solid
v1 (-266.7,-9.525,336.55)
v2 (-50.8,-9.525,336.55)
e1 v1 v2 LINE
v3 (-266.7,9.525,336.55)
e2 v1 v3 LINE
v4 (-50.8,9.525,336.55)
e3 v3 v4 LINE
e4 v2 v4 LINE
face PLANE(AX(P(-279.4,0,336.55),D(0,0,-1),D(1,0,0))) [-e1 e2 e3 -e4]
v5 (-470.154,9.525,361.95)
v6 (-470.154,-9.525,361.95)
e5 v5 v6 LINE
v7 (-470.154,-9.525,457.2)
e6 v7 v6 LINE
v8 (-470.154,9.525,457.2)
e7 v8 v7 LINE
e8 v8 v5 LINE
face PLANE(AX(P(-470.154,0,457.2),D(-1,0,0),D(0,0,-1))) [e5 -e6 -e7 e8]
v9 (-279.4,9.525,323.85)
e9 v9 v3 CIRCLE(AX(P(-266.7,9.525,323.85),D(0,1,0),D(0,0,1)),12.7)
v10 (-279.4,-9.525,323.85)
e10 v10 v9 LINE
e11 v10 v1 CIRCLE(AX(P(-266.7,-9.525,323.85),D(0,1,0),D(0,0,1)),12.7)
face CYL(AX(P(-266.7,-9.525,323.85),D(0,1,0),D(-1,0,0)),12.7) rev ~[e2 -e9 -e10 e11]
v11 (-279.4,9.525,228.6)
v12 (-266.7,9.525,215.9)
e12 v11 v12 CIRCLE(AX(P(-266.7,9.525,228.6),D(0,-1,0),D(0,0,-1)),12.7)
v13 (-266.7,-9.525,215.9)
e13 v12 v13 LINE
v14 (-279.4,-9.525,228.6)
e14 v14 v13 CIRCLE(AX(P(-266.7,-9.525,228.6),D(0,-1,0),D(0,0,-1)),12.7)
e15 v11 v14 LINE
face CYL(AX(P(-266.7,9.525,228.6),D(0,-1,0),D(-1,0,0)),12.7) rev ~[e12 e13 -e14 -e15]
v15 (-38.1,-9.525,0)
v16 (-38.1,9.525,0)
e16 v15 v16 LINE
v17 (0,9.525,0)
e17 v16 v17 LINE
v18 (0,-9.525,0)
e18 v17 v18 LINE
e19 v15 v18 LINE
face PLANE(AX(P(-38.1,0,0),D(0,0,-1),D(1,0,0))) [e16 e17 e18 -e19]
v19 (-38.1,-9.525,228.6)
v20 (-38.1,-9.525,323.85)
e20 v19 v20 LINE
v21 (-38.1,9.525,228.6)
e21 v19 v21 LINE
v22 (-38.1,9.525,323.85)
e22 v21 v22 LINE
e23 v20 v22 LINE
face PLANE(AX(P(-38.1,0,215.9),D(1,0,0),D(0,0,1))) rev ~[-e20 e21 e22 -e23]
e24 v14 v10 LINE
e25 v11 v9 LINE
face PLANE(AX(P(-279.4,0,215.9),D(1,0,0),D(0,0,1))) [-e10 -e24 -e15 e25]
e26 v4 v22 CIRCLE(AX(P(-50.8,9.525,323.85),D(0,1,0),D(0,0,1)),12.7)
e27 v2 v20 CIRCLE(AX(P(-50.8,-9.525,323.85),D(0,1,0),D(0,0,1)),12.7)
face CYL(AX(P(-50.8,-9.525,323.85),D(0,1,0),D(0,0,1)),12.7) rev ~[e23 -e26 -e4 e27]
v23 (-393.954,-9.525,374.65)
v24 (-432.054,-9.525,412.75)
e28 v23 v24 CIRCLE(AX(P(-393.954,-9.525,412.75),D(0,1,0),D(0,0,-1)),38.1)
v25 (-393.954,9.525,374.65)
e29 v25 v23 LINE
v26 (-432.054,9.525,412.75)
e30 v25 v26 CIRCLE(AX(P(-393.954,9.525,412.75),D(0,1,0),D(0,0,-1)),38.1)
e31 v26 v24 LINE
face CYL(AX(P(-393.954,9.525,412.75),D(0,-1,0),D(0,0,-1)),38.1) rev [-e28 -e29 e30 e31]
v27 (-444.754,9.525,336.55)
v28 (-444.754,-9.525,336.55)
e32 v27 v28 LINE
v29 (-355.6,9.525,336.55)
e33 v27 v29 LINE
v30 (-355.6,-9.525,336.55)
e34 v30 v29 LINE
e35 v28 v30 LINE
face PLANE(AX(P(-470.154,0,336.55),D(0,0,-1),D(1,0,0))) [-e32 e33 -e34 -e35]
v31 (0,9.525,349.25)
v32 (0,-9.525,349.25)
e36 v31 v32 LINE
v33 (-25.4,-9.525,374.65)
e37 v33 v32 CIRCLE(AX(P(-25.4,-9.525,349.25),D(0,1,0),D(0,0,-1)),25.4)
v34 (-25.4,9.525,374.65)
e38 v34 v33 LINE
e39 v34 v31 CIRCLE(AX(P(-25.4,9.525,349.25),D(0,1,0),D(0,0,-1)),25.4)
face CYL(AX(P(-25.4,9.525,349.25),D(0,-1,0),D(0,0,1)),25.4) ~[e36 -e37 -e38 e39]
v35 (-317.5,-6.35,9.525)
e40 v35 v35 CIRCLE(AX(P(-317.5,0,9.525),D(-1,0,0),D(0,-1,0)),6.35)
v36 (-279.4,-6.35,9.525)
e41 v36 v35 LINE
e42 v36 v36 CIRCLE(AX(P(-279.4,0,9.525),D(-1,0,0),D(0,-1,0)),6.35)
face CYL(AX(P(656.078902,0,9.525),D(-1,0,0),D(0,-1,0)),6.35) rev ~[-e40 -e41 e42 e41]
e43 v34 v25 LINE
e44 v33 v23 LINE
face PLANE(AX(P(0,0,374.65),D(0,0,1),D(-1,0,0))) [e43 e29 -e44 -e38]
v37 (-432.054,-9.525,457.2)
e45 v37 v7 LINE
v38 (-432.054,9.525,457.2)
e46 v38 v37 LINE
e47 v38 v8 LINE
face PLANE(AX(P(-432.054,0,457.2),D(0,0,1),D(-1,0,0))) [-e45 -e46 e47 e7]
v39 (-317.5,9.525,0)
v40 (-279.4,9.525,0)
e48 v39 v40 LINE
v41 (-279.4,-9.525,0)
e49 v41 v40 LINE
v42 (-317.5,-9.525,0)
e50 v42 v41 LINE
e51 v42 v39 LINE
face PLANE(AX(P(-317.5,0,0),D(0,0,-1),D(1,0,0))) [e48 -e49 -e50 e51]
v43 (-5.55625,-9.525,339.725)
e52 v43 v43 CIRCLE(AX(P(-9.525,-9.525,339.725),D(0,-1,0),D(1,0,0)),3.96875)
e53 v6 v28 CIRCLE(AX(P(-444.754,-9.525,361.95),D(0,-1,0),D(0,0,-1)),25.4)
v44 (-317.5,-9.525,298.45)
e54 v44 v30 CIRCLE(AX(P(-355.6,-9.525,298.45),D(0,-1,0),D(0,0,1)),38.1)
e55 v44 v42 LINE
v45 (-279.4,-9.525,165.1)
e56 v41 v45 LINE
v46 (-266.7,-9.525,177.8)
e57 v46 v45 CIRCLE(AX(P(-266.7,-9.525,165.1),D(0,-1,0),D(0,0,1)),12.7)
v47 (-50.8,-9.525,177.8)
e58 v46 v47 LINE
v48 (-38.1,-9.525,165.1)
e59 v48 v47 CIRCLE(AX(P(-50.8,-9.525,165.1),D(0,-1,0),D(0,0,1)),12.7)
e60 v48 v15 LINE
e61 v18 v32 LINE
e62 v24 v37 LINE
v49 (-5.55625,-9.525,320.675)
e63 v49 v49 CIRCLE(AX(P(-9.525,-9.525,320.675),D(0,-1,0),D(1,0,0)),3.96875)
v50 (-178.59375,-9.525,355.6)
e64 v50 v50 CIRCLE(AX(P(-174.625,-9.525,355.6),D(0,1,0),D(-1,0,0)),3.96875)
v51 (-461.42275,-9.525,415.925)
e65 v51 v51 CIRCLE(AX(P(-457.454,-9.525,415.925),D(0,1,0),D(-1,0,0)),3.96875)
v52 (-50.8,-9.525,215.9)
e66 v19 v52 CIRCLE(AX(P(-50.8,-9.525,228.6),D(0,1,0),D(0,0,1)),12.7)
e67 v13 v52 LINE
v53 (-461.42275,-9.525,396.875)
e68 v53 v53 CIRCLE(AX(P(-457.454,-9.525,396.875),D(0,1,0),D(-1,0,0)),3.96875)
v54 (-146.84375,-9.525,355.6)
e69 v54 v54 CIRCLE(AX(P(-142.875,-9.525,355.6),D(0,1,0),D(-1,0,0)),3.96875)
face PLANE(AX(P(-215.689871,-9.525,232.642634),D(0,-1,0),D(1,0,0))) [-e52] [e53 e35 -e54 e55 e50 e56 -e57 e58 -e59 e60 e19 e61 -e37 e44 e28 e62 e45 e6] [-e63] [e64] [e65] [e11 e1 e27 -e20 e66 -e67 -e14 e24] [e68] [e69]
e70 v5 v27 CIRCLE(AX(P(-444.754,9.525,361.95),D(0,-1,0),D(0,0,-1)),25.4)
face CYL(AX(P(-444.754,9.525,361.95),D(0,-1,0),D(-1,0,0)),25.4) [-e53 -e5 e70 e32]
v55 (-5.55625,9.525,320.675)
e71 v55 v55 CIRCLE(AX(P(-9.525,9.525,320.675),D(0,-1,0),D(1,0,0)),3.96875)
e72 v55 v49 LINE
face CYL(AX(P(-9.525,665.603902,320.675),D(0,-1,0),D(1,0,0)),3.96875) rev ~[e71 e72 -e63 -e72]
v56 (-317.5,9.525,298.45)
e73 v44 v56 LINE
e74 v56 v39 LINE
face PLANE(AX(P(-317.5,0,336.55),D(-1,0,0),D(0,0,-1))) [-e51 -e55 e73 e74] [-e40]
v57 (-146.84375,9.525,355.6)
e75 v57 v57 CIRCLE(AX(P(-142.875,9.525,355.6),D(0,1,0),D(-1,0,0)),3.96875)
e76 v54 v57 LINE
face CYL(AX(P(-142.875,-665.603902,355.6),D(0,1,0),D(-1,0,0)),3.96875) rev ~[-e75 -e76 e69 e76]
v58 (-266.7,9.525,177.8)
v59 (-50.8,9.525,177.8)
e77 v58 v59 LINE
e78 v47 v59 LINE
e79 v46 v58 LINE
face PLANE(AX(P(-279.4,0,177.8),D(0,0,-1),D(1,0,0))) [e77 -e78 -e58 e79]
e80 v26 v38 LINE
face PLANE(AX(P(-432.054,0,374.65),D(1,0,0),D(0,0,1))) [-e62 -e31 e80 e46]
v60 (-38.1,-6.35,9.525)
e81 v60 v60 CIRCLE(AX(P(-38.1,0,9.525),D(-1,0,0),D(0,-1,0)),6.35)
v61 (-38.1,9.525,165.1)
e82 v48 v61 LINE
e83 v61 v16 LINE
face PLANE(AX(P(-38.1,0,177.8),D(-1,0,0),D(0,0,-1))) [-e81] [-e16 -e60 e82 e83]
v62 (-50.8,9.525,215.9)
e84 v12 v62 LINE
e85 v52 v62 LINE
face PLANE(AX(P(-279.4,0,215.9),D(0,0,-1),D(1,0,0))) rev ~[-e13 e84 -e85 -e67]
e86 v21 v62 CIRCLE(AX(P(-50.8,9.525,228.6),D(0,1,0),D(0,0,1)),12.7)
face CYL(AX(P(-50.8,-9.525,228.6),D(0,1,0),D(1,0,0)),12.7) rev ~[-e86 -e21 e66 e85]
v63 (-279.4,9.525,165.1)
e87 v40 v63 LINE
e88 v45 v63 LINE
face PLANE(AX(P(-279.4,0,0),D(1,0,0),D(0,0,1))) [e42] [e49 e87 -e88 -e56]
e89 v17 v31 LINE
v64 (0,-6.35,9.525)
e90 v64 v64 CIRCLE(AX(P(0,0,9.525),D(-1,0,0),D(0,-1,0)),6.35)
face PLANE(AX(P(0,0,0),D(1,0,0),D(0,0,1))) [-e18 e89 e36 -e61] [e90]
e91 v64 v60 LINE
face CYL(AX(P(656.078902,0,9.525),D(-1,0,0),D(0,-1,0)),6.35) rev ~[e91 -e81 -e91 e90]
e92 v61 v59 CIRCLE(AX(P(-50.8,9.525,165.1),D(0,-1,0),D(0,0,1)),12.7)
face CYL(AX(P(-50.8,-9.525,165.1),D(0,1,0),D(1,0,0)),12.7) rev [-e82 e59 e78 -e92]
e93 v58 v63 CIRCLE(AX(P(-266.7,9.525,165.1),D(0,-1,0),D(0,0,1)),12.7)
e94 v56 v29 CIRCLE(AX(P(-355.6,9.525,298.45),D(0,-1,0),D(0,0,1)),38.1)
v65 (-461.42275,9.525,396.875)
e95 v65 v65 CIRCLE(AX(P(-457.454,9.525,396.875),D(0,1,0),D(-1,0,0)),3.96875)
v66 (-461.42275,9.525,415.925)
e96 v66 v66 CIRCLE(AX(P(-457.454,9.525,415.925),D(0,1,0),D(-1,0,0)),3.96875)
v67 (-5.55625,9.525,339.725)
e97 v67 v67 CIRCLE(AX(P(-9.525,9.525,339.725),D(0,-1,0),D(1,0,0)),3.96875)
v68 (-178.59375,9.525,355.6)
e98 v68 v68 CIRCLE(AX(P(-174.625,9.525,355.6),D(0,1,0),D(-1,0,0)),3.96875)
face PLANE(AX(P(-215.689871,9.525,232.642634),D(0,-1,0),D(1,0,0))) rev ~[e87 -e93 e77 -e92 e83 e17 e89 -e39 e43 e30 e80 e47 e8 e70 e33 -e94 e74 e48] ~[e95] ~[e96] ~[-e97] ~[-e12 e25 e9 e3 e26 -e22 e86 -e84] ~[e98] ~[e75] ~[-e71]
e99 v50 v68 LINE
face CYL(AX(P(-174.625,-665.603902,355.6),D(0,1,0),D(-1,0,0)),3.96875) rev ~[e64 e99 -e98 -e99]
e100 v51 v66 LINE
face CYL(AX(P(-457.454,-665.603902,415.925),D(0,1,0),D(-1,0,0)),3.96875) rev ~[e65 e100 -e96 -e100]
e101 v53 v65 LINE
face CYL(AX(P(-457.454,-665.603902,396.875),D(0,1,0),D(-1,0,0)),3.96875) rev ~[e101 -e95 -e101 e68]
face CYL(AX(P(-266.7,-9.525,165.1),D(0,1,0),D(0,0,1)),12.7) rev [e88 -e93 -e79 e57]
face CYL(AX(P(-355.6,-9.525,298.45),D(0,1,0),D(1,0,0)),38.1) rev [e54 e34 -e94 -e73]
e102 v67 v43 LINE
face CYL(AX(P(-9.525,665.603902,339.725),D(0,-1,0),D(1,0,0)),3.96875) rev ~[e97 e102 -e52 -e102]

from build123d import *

# Parameters (mm, degrees)
F0_W     = 241.3
F0_H     = 120.65
F1_DEPTH = 9.525
F2_R     = 12.7
F3_R     = 38.1
F5_D     = 12.7
F6_R     = 25.4
F8_D     = 7.9375
F10_D    = 7.9375
F12_D    = 7.9375


# Not quite as in the source:
# - a length typed as a fraction of an inch, garbled in the dataset ("3 / 203.2 mm" for 3/8 in), is restored


with BuildPart() as f1:
    # F0 (on Front) → F1 (new body, symmetric)
    with BuildSketch(Plane.XZ):
        Polygon((-38.1, 0), (0, 0), (0, 374.65), (-432.054, 374.65), (-432.054, 457.2), (-470.154, 457.2), (-470.154, 336.55), (-317.5, 336.55), (-317.5, 0), (-279.4, 0), (-279.4, 177.8), (-38.1, 177.8), align=None)
        with Locations((-158.75, 276.225)):
            Rectangle(F0_W, F0_H, mode=Mode.SUBTRACT)
    extrude(amount=F1_DEPTH, both=True)

    # F2
    f2_edges = [f1.edges().sort_by_distance(p)[0] for p in [
        (-279.4, 0, 336.55),
        (-279.4, 0, 215.9),
        (-38.1, 0, 215.9),
        (-38.1, 0, 336.55),
        (-279.4, 0, 177.8),
        (-38.1, 0, 177.8),
    ]]
    fillet(f2_edges, radius=F2_R)

    # F3
    f3_edges = [f1.edges().sort_by_distance(p)[0] for p in [
        (-317.5, 0, 336.55),
        (-432.054, 0, 374.65),
    ]]
    fillet(f3_edges, radius=F3_R)

    # F5 (through all)
    with Locations(Plane.YZ):
        with Locations((0, 9.525)):
            Hole(F5_D / 2)

    # F6
    f6_edges = [f1.edges().sort_by_distance(p)[0] for p in [
        (-470.154, 0, 336.55),
        (0, 0, 374.65),
    ]]
    fillet(f6_edges, radius=F6_R)

    # F8 (through all)
    with Locations(Plane.XZ.offset(9.525)):
        with Locations((-174.625, 355.6), (-142.875, 355.6)):
            Hole(F8_D / 2)

    # F10 (through all)
    with Locations(Plane(origin=(0, 9.525, 0), x_dir=(-1, 0, 0), z_dir=(0, 1, 0))):
        with Locations((9.525, 320.675), (9.525, 339.725)):
            Hole(F10_D / 2)

    # F12 (through all)
    with Locations(Plane.XZ.offset(9.525)):
        with Locations((-457.454, 415.925), (-457.454, 396.875)):
            Hole(F12_D / 2)


solid = f1.part
